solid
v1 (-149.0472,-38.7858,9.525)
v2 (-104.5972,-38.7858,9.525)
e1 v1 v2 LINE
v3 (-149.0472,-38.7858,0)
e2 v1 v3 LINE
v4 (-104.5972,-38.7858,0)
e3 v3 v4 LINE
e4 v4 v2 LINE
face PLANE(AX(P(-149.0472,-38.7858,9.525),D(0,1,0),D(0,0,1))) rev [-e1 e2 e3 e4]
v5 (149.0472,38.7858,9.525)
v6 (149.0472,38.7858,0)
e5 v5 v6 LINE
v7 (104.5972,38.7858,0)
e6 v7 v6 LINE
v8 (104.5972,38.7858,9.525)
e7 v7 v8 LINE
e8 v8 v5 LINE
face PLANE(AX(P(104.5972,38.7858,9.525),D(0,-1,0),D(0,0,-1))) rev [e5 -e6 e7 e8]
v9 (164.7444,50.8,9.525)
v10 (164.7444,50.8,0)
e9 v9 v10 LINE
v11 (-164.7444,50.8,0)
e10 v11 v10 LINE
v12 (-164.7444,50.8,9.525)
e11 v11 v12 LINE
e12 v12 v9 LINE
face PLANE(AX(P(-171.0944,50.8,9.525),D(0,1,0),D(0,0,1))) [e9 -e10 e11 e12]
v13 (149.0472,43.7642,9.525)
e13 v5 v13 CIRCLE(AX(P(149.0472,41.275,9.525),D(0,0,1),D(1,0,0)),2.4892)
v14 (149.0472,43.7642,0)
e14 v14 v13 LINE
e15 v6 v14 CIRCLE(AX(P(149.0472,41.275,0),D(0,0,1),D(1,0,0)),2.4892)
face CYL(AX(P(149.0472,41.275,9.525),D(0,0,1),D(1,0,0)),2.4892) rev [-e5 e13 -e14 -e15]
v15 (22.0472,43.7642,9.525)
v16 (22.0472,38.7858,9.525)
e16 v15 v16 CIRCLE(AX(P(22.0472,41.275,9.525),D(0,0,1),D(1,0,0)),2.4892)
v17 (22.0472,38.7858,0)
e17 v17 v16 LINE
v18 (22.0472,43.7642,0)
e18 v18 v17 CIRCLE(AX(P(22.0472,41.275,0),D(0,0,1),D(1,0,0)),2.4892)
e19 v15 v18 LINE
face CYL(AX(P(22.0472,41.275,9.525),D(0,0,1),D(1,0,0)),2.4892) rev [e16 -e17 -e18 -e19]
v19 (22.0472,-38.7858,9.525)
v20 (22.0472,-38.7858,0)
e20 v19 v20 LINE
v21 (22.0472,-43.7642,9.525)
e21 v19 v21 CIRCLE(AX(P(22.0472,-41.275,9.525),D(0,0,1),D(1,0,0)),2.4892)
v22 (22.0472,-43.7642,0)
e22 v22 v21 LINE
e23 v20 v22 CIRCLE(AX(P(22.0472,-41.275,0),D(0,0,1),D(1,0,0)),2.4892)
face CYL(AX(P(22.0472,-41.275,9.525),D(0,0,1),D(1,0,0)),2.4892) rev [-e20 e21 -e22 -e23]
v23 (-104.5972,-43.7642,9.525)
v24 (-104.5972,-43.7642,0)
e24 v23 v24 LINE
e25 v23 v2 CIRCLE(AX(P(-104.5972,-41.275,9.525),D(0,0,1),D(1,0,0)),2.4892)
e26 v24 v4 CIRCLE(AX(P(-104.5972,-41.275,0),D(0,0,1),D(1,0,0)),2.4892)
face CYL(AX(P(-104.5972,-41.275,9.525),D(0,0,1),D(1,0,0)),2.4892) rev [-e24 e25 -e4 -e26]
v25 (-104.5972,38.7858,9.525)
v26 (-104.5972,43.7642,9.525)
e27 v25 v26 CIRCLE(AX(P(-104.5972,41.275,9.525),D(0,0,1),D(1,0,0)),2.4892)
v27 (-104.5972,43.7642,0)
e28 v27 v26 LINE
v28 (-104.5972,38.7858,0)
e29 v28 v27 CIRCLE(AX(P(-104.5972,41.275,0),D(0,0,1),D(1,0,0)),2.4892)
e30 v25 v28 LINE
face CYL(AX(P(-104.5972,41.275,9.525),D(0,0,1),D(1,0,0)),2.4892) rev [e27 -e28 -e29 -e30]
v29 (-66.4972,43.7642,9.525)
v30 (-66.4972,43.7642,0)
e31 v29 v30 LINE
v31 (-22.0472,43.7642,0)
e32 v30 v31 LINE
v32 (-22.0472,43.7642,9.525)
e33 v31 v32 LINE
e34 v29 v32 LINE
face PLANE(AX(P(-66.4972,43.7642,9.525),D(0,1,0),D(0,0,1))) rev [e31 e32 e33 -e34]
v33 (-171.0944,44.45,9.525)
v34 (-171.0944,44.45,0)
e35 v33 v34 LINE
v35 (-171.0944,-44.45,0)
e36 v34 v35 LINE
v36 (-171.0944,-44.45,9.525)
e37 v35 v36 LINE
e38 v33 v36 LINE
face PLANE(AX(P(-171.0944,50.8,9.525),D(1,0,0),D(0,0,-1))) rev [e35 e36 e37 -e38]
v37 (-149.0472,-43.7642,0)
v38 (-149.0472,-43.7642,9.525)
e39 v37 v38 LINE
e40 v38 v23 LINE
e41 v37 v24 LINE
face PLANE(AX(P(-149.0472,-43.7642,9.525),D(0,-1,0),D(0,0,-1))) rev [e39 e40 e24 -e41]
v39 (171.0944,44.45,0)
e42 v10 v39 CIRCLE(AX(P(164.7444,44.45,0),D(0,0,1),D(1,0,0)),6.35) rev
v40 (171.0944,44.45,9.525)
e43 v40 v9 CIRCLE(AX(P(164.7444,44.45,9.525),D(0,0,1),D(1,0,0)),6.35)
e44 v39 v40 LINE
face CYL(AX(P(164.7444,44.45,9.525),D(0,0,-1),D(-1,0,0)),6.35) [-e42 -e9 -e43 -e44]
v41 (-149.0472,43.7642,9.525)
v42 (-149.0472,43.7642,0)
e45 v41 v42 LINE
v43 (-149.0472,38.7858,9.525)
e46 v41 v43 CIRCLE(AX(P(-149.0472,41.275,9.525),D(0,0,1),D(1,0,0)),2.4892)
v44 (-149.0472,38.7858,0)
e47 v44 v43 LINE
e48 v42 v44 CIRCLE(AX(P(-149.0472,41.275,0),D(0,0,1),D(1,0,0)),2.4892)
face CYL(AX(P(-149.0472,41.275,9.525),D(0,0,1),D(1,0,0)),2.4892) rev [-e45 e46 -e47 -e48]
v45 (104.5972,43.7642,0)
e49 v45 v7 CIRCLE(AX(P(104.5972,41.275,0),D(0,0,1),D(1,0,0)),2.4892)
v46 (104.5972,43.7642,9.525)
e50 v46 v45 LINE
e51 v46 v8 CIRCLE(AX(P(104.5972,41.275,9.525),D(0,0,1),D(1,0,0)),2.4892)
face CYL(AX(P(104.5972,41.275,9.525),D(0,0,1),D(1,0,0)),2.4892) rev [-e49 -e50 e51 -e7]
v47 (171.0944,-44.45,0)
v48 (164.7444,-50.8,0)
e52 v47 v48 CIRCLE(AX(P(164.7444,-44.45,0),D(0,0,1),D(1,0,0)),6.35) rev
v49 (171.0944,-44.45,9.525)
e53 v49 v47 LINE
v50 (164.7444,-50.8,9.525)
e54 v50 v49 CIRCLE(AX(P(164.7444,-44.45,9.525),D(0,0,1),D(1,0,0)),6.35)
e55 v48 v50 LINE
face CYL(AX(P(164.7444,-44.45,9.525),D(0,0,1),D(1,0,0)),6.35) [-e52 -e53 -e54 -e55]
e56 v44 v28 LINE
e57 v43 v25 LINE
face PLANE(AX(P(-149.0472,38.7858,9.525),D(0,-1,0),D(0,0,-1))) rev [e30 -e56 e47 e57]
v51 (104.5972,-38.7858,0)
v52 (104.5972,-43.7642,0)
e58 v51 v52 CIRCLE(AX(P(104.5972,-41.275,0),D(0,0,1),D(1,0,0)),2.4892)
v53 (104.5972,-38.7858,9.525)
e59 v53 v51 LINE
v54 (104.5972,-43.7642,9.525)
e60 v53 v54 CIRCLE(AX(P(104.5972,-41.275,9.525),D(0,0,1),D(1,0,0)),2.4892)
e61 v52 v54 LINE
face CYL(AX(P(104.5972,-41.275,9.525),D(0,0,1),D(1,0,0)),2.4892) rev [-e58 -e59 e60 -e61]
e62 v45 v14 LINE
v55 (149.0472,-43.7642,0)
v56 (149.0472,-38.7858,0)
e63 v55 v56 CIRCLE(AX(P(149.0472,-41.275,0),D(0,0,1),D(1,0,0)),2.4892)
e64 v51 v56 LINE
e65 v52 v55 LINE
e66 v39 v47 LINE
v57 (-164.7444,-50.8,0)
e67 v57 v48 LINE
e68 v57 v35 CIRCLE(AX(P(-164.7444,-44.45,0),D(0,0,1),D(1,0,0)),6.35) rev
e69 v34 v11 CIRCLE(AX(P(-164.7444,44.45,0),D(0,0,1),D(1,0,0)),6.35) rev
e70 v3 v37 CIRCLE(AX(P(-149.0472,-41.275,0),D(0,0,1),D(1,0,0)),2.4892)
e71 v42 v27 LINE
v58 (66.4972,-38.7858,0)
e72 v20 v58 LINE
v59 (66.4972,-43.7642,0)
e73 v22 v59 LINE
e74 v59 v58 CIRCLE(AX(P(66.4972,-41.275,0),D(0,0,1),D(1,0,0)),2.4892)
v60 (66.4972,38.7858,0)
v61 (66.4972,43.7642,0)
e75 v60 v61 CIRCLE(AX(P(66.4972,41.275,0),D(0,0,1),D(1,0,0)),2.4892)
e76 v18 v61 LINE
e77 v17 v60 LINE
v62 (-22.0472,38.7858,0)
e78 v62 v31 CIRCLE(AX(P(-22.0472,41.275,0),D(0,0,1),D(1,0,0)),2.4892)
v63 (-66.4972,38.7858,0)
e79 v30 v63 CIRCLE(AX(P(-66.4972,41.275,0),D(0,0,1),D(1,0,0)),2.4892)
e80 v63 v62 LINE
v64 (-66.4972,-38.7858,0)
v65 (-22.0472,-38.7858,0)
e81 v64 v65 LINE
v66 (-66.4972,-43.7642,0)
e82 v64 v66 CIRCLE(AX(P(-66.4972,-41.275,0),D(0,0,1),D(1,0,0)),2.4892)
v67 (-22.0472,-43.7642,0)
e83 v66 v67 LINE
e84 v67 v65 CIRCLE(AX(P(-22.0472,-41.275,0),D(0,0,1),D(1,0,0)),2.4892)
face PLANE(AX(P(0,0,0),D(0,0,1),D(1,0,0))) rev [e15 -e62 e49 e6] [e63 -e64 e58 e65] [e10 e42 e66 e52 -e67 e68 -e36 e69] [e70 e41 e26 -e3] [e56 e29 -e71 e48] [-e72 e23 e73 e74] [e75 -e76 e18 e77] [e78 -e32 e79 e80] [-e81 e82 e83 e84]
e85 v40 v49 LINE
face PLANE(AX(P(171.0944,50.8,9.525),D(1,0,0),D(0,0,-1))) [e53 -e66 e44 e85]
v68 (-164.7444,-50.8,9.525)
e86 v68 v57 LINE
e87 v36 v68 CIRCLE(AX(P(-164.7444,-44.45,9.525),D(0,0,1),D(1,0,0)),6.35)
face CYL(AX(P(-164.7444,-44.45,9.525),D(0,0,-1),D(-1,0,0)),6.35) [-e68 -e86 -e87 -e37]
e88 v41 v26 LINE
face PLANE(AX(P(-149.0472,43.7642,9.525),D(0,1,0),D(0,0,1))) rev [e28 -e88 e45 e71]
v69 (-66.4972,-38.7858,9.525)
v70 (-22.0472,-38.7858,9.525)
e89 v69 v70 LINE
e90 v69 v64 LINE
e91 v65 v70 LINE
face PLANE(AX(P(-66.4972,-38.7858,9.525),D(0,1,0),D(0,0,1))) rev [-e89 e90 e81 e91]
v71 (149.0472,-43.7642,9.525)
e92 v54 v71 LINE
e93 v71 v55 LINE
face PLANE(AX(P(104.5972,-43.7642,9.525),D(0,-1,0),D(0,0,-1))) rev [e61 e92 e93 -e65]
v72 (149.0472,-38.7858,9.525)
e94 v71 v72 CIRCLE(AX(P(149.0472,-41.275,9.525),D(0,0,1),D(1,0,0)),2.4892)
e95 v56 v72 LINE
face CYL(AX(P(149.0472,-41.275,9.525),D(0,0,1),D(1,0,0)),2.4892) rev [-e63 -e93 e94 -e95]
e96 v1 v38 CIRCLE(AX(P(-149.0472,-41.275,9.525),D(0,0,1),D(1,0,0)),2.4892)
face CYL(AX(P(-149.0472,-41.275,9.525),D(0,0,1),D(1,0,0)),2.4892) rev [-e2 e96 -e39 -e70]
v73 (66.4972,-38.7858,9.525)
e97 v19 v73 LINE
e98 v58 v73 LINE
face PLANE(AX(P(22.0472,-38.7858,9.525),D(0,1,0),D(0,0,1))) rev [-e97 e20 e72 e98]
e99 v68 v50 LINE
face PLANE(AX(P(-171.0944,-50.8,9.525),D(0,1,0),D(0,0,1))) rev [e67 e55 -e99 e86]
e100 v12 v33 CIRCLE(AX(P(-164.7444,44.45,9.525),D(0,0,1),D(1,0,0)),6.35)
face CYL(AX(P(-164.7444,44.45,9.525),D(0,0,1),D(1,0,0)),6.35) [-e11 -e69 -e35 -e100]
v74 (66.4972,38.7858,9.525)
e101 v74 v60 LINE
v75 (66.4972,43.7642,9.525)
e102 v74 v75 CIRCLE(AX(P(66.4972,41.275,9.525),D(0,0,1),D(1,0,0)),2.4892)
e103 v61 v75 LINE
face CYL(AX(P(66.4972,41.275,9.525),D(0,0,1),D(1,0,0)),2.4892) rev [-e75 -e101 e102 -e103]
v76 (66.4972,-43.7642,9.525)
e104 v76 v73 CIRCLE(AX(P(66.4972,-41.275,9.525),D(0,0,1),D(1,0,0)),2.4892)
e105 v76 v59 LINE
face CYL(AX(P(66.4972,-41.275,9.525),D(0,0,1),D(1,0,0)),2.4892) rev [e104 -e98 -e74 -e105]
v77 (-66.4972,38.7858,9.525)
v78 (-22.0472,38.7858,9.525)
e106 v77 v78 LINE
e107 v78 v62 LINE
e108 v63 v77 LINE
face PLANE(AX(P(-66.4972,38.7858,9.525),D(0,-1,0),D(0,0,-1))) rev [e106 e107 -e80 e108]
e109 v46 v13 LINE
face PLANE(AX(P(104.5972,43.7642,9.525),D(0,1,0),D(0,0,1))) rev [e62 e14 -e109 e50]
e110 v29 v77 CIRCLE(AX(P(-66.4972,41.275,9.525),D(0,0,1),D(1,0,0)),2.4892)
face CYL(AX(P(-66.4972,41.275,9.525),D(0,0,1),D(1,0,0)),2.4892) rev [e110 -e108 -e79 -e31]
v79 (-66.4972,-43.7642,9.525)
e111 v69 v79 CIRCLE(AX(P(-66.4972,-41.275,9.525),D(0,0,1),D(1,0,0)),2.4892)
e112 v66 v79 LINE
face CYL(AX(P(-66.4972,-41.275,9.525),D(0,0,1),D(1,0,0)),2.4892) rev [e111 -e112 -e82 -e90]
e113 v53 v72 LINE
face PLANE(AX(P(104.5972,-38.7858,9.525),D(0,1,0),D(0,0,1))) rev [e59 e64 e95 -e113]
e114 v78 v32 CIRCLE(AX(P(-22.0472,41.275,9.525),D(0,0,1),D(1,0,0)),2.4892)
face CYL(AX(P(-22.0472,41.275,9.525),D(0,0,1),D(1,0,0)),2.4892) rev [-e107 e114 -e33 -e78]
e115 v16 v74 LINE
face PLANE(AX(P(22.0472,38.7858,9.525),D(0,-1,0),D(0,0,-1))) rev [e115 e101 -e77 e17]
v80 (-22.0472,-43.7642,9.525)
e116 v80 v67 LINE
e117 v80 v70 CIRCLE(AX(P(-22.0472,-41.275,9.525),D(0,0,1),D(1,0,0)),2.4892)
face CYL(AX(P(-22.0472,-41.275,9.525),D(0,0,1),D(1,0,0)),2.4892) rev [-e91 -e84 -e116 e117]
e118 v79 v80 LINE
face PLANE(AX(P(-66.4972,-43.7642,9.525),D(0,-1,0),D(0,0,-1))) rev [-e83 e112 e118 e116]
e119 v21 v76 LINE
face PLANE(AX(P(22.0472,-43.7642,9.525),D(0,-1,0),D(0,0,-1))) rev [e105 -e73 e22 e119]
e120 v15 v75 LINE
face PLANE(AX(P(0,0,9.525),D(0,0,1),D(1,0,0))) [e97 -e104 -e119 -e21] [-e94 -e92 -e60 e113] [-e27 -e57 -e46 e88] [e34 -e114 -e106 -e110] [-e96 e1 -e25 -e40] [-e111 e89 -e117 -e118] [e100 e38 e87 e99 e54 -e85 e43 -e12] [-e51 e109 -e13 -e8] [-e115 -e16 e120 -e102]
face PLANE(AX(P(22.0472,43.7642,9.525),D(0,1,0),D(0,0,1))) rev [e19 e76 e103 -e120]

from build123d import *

# Parameters (mm, degrees)
SKETCH1_W                  = 342.1888
SKETCH1_H                  = 101.6
BOSS_EXTRUDE1_DEPTH        = 9.525
F_10_CLEARANCE_SLOT1_DEPTH = 9.525
FILLET1_R                  = 6.35


# Read off the part's stored shape, not the designer's step: #10 Clearance Slot1
with BuildPart() as part:
    # Sketch1 → Boss-Extrude1 (new body)
    with BuildSketch(Plane.XY):
        Rectangle(SKETCH1_W, SKETCH1_H)
    extrude(amount=BOSS_EXTRUDE1_DEPTH)

    # #10 Clearance Slot1 outline → #10 Clearance Slot1 (cut)
    with BuildSketch(Plane.XY):
        with BuildLine():
            Line((-149.0472, 38.7858), (-104.5972, 38.7858))
            ThreePointArc((-104.5972, 38.7858), (-102.108, 41.275), (-104.5972, 43.7642))
            Line((-104.5972, 43.7642), (-149.0472, 43.7642))
            ThreePointArc((-149.0472, 43.7642), (-151.5364, 41.275), (-149.0472, 38.7858))
        make_face()
        with BuildLine():
            ThreePointArc((-22.0472, 38.7858), (-19.558, 41.275), (-22.0472, 43.7642))
            Line((-22.0472, 43.7642), (-66.4972, 43.7642))
            ThreePointArc((-66.4972, 43.7642), (-68.9864, 41.275), (-66.4972, 38.7858))
            Line((-66.4972, 38.7858), (-22.0472, 38.7858))
        make_face()
        with BuildLine():
            ThreePointArc((66.4972, 38.7858), (68.9864, 41.275), (66.4972, 43.7642))
            Line((66.4972, 43.7642), (22.0472, 43.7642))
            ThreePointArc((22.0472, 43.7642), (19.558, 41.275), (22.0472, 38.7858))
            Line((22.0472, 38.7858), (66.4972, 38.7858))
        make_face()
        with BuildLine():
            ThreePointArc((149.0472, 38.7858), (151.5364, 41.275), (149.0472, 43.7642))
            Line((149.0472, 43.7642), (104.5972, 43.7642))
            ThreePointArc((104.5972, 43.7642), (102.108, 41.275), (104.5972, 38.7858))
            Line((104.5972, 38.7858), (149.0472, 38.7858))
        make_face()
        with BuildLine():
            Line((104.5972, -43.7642), (149.0472, -43.7642))
            ThreePointArc((149.0472, -43.7642), (151.5364, -41.275), (149.0472, -38.7858))
            Line((149.0472, -38.7858), (104.5972, -38.7858))
            ThreePointArc((104.5972, -38.7858), (102.108, -41.275), (104.5972, -43.7642))
        make_face()
        with BuildLine():
            ThreePointArc((66.4972, -43.7642), (68.9864, -41.275), (66.4972, -38.7858))
            Line((66.4972, -38.7858), (22.0472, -38.7858))
            ThreePointArc((22.0472, -38.7858), (19.558, -41.275), (22.0472, -43.7642))
            Line((22.0472, -43.7642), (66.4972, -43.7642))
        make_face()
        with BuildLine():
            ThreePointArc((-22.0472, -43.7642), (-19.558, -41.275), (-22.0472, -38.7858))
            Line((-22.0472, -38.7858), (-66.4972, -38.7858))
            ThreePointArc((-66.4972, -38.7858), (-68.9864, -41.275), (-66.4972, -43.7642))
            Line((-66.4972, -43.7642), (-22.0472, -43.7642))
        make_face()
        with BuildLine():
            ThreePointArc((-104.5972, -43.7642), (-102.108, -41.275), (-104.5972, -38.7858))
            Line((-104.5972, -38.7858), (-149.0472, -38.7858))
            ThreePointArc((-149.0472, -38.7858), (-151.5364, -41.275), (-149.0472, -43.7642))
            Line((-149.0472, -43.7642), (-104.5972, -43.7642))
        make_face()
    extrude(amount=F_10_CLEARANCE_SLOT1_DEPTH, mode=Mode.SUBTRACT)

    # Fillet1
    fillet1_edges = [part.edges().sort_by_distance(p)[0] for p in [
        (-171.0944, 50.8, 4.7625),
        (171.0944, 50.8, 4.7625),
        (171.0944, -50.8, 4.7625),
        (-171.0944, -50.8, 4.7625),
    ]]
    fillet(fillet1_edges, radius=FILLET1_R)


solid = part.part
